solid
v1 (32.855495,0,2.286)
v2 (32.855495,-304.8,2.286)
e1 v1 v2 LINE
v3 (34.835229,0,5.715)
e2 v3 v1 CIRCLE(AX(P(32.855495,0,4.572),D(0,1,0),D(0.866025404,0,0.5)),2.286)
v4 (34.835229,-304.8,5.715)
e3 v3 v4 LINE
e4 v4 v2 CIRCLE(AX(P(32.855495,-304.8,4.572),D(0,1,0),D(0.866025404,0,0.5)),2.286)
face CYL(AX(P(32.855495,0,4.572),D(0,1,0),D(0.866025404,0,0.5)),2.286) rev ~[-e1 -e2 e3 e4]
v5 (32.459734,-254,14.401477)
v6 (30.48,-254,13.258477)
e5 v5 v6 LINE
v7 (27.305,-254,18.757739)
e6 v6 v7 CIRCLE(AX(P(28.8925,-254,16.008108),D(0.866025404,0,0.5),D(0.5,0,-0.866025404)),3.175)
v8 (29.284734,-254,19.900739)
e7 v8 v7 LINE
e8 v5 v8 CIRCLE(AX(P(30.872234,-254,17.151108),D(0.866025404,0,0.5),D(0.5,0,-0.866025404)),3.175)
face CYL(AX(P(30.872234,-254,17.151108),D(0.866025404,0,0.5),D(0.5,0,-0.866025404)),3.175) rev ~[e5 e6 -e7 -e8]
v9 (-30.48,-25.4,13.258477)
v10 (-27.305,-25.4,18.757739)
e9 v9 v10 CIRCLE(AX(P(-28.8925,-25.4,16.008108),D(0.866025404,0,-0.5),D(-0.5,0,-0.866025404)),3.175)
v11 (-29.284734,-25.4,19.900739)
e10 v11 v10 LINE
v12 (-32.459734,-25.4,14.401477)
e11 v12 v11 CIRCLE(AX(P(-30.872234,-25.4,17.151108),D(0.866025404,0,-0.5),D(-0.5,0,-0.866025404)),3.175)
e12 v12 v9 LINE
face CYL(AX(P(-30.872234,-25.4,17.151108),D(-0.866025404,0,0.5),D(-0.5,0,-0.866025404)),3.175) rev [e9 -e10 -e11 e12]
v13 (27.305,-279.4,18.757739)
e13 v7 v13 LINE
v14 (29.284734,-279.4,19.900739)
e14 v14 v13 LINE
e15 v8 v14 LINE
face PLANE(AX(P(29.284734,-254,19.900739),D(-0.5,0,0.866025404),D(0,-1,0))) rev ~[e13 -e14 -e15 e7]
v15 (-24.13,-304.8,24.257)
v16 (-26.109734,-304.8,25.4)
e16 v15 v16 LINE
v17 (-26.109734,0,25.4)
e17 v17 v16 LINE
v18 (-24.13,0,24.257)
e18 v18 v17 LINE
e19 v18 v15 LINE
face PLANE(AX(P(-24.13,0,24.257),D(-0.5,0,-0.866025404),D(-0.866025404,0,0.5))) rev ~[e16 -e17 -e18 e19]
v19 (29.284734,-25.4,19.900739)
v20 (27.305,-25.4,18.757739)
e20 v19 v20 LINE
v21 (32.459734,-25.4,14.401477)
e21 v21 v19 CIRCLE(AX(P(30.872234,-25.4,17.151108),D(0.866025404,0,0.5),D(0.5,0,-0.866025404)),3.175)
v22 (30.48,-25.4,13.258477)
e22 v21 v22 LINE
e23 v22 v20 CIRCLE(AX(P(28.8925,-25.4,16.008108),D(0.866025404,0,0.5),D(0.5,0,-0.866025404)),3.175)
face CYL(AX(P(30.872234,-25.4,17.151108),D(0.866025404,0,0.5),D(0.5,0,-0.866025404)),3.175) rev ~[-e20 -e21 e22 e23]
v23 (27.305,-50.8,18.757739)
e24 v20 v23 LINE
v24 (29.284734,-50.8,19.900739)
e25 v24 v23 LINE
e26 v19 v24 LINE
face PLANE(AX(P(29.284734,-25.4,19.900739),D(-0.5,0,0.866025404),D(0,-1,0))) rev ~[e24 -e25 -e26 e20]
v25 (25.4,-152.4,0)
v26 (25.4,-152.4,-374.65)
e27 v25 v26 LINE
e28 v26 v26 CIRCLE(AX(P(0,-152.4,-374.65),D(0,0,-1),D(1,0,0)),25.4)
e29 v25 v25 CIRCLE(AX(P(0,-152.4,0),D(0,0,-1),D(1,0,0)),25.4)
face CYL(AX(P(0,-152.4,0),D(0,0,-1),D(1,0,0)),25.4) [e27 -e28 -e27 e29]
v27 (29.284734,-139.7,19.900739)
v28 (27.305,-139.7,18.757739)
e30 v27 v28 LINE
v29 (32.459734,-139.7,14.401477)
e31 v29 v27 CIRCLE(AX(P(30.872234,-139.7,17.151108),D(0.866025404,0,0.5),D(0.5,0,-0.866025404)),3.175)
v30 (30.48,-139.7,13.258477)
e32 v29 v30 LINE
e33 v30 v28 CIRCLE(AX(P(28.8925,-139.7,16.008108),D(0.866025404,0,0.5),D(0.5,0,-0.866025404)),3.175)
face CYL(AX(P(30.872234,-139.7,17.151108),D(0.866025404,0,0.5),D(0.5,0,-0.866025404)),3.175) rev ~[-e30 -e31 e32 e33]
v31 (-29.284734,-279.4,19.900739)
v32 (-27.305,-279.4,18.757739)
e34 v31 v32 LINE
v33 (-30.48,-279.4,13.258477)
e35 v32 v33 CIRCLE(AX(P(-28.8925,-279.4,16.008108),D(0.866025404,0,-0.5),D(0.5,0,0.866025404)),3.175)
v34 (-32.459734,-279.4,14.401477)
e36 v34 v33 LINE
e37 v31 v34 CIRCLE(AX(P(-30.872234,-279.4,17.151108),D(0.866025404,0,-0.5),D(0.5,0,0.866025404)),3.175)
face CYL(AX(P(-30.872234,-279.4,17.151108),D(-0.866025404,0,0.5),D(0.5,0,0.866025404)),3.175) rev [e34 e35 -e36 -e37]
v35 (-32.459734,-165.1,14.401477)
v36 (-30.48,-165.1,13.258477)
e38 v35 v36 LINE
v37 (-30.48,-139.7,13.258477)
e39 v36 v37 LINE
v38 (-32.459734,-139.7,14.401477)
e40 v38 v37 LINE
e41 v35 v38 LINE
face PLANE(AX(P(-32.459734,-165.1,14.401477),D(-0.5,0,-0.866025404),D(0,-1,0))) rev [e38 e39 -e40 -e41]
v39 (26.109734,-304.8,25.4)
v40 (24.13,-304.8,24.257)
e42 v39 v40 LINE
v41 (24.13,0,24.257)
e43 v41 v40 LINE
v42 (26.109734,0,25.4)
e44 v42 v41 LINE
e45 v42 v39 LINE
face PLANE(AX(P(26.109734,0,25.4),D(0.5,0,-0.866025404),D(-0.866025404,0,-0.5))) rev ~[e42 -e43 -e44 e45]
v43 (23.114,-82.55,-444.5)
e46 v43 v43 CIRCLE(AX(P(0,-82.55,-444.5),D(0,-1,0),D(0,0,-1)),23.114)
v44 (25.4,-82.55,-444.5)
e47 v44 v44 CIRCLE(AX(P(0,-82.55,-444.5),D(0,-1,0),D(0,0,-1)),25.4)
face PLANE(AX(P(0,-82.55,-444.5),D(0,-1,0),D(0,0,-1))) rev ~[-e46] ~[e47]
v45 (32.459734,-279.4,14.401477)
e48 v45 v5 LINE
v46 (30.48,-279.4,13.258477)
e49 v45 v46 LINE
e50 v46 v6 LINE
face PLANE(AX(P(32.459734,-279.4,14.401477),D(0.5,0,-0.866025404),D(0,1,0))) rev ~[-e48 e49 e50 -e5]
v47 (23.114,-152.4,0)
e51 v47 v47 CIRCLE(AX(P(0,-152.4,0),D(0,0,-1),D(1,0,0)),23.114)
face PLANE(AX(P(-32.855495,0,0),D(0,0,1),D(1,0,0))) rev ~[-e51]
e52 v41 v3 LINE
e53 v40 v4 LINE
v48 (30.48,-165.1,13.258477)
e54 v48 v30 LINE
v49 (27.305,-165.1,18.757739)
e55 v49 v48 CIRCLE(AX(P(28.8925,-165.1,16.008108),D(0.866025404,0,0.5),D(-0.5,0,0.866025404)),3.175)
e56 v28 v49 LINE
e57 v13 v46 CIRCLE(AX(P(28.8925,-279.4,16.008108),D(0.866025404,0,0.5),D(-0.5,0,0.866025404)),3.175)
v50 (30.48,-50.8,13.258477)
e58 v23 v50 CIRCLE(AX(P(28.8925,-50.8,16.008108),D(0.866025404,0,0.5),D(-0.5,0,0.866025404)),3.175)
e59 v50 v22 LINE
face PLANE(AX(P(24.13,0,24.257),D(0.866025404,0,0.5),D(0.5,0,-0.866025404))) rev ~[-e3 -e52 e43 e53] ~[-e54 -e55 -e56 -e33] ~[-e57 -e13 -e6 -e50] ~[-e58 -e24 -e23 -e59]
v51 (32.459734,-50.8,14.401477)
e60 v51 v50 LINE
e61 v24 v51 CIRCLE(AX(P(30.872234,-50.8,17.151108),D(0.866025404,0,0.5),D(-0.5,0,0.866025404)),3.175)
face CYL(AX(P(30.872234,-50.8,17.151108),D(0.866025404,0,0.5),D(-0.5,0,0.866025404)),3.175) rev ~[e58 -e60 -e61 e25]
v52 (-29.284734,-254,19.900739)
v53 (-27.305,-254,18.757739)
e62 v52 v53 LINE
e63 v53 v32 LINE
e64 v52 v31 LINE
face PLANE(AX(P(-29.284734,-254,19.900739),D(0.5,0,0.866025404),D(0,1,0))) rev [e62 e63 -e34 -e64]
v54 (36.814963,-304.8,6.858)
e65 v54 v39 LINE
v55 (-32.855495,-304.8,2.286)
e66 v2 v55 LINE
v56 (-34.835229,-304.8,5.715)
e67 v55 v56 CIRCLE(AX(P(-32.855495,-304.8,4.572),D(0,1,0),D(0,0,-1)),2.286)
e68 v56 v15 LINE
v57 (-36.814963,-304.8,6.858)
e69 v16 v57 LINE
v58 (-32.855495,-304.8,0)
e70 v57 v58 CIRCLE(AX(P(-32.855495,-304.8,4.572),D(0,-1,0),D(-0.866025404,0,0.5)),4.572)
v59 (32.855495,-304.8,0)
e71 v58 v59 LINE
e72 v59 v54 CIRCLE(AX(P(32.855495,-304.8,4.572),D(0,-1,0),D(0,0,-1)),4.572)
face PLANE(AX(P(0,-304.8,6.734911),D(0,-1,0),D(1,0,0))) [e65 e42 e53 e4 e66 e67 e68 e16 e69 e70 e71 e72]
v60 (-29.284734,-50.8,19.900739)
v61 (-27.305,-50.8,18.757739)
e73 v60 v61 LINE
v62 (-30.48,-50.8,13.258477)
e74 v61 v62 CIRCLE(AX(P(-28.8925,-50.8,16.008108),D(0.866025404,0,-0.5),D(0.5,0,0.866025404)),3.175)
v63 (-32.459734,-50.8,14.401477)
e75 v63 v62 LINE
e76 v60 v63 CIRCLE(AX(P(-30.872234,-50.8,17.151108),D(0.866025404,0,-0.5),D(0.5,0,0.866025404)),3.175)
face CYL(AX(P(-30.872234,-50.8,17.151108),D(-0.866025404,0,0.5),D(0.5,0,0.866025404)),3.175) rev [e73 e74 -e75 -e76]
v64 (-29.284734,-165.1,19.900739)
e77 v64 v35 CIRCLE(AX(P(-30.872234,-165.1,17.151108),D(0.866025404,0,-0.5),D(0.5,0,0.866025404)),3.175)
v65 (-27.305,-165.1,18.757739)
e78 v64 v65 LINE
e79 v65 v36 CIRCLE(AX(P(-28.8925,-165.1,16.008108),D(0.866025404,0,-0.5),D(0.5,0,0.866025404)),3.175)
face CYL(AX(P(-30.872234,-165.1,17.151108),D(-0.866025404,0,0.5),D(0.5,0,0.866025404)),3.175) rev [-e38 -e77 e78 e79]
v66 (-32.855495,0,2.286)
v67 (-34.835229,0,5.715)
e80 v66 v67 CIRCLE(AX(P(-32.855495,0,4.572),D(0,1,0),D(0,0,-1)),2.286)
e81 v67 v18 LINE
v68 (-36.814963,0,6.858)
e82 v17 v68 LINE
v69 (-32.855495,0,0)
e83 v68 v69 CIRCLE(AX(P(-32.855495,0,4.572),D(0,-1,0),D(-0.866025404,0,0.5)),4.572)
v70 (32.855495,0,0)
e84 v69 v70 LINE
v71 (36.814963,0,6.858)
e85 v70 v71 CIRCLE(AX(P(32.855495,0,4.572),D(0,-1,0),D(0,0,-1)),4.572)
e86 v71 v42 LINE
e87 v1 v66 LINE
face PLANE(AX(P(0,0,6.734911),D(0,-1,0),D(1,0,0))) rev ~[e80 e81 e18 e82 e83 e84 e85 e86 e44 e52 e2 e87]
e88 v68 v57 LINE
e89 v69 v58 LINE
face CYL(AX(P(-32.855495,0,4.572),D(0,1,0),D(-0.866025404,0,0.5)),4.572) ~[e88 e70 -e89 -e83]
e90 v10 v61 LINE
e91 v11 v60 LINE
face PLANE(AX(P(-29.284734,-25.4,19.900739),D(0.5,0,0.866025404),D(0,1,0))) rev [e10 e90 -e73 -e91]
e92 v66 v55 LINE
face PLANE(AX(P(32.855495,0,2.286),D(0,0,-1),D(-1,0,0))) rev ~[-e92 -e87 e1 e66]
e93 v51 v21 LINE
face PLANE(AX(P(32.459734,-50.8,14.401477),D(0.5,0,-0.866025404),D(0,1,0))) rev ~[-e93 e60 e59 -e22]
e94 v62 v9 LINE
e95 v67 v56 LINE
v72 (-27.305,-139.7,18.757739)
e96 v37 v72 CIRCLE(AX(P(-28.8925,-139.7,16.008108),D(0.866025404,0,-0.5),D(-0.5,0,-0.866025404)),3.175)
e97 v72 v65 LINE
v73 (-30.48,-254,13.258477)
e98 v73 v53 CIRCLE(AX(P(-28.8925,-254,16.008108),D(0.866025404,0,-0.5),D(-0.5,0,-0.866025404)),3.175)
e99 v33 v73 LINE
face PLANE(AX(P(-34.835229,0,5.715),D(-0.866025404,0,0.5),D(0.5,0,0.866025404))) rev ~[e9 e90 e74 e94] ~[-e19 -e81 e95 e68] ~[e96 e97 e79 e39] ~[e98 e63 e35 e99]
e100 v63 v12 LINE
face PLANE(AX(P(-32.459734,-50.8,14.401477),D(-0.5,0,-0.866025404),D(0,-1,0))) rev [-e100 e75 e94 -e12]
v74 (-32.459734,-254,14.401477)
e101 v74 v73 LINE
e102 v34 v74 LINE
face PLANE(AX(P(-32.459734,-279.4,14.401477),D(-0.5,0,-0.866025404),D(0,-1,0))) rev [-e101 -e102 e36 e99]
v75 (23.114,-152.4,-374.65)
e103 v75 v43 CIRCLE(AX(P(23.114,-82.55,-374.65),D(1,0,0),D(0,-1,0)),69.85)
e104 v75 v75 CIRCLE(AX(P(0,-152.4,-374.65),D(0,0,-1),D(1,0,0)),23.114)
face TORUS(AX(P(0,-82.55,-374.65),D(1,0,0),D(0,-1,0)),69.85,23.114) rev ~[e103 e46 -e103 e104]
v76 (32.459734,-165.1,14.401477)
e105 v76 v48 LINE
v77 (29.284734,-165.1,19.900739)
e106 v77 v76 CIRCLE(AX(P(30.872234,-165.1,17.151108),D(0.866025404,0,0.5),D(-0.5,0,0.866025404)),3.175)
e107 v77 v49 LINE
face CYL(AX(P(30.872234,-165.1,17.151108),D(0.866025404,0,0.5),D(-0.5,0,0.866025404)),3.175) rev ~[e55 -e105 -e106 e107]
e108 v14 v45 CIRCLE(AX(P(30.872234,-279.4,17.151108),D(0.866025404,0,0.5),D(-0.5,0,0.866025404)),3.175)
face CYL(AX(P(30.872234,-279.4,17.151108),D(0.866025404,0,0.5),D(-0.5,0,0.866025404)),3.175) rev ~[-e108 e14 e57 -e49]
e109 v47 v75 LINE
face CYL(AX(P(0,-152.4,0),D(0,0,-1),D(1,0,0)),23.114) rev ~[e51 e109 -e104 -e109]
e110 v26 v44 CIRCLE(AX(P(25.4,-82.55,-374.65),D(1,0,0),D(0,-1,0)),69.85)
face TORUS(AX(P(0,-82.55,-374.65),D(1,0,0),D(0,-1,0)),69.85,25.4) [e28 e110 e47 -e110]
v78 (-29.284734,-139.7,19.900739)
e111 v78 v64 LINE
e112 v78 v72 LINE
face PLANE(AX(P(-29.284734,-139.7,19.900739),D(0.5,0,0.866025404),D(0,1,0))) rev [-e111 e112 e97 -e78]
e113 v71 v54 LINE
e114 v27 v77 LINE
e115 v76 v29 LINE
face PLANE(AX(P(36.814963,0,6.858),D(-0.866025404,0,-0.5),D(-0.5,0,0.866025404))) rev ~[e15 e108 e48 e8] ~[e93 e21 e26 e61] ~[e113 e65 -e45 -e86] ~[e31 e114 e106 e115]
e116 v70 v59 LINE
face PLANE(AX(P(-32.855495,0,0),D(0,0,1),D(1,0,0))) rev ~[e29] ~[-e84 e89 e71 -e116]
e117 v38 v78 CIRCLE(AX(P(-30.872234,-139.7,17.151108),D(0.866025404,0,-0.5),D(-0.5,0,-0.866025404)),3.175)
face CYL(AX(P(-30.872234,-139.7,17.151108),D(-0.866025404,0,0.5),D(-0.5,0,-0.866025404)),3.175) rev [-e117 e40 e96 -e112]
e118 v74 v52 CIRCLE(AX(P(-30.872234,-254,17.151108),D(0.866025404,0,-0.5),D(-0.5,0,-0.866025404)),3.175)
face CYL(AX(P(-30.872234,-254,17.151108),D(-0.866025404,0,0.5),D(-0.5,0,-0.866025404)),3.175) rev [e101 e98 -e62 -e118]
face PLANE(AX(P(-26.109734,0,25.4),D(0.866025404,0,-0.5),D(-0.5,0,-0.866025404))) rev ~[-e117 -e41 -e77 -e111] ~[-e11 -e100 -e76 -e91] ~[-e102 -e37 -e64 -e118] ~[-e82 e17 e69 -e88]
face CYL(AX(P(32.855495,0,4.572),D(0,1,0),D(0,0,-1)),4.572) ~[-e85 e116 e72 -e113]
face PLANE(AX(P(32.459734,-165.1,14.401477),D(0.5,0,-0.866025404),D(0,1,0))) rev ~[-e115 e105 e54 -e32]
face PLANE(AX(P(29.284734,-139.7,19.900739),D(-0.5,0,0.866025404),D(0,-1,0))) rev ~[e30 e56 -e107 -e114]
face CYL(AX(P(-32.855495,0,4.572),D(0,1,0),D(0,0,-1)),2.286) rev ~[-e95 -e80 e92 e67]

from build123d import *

# Parameters (mm, degrees)
F1_DEPTH = 304.8
F5_R     = 25.4
F5_R_2   = 23.114
F8_DEPTH = 2.286


# Not quite as in the source:
# - a pattern or mirror of a feature is missing from the dataset's text; its kind, count and spacing are read off the source's solid


with BuildPart() as f1:
    # F0 (on Front) → F1 (new body)
    with BuildSketch(Plane.XZ):
        with BuildLine():
            ThreePointArc((-36.8149627644, 6.858), (-36.8149627644, 2.286), (-32.8554946183, 0))
            Line((-32.8554946183, 0), (32.8554946183, 0))
            ThreePointArc((32.8554946183, 0), (36.8149627644, 2.286), (36.8149627644, 6.858))
            Line((36.8149627644, 6.858), (26.1097340731, 25.4))
            Line((26.1097340731, 25.4), (24.13, 24.257))
            Line((24.13, 24.257), (34.8352286913, 5.715))
            ThreePointArc((34.8352286913, 5.715), (34.8352286913, 3.429), (32.8554946183, 2.286))
            Line((32.8554946183, 2.286), (-32.8554946183, 2.286))
            ThreePointArc((-32.8554946183, 2.286), (-34.8352286913, 3.429), (-34.8352286913, 5.715))
            Line((-34.8352286913, 5.715), (-24.13, 24.257))
            Line((-24.13, 24.257), (-26.1097340731, 25.4))
            Line((-26.1097340731, 25.4), (-36.8149627644, 6.858))
        make_face()
    extrude(amount=F1_DEPTH)

    # F6: sweep along a path in F3
    with BuildLine(Plane.YZ) as f6_path:
        Line((-152.4, 0), (-152.4, -374.65))
        ThreePointArc((-152.4, -374.65), (-131.9414086659, -424.0414086659), (-82.55, -444.5))
    # F5 (on plane+point) → F6 (sweep)
    with BuildSketch(Plane.XZ.offset(82.55)):
        with Locations((0, -444.5)):
            Circle(F5_R)
        with Locations((0, -444.5)):
            Circle(F5_R_2, mode=Mode.SUBTRACT)
    sweep(path=f6_path.line)

    # F7 (on face) → F8 (cut, through all)
    with BuildSketch(Plane(origin=(30.5808231829, 0, 17.6558464967), x_dir=(0, 1, 0), z_dir=(0.8660254038, 0, 0.5))):
        with BuildLine():
            Line((-254, 2.5921782196), (-279.4, 2.5921782196))
            ThreePointArc((-279.4, 2.5921782196), (-282.575, -0.5828217804), (-279.4, -3.7578217804))
            Line((-279.4, -3.7578217804), (-254, -3.7578217804))
            ThreePointArc((-254, -3.7578217804), (-250.825, -0.5828217804), (-254, 2.5921782196))
        make_face()
        with BuildLine():
            Line((-139.7, 2.5921782196), (-165.1, 2.5921782196))
            ThreePointArc((-165.1, 2.5921782196), (-168.275, -0.5828217804), (-165.1, -3.7578217804))
            Line((-165.1, -3.7578217804), (-139.7, -3.7578217804))
            ThreePointArc((-139.7, -3.7578217804), (-136.525, -0.5828217804), (-139.7, 2.5921782196))
        make_face()
        with BuildLine():
            ThreePointArc((-25.4, -3.7578217804), (-22.225, -0.5828217804), (-25.4, 2.5921782196))
            Line((-25.4, 2.5921782196), (-50.8, 2.5921782196))
            ThreePointArc((-50.8, 2.5921782196), (-53.975, -0.5828217804), (-50.8, -3.7578217804))
            Line((-50.8, -3.7578217804), (-25.4, -3.7578217804))
        make_face()
    f8 = extrude(amount=-F8_DEPTH, mode=Mode.SUBTRACT)

    # F8_copies: F8 across plane
    add(f8.mirror(Plane(origin=(0, 0, 0), x_dir=(0, 0, -1), z_dir=(-1, 0, 0))), mode=Mode.SUBTRACT)


solid = f1.part
